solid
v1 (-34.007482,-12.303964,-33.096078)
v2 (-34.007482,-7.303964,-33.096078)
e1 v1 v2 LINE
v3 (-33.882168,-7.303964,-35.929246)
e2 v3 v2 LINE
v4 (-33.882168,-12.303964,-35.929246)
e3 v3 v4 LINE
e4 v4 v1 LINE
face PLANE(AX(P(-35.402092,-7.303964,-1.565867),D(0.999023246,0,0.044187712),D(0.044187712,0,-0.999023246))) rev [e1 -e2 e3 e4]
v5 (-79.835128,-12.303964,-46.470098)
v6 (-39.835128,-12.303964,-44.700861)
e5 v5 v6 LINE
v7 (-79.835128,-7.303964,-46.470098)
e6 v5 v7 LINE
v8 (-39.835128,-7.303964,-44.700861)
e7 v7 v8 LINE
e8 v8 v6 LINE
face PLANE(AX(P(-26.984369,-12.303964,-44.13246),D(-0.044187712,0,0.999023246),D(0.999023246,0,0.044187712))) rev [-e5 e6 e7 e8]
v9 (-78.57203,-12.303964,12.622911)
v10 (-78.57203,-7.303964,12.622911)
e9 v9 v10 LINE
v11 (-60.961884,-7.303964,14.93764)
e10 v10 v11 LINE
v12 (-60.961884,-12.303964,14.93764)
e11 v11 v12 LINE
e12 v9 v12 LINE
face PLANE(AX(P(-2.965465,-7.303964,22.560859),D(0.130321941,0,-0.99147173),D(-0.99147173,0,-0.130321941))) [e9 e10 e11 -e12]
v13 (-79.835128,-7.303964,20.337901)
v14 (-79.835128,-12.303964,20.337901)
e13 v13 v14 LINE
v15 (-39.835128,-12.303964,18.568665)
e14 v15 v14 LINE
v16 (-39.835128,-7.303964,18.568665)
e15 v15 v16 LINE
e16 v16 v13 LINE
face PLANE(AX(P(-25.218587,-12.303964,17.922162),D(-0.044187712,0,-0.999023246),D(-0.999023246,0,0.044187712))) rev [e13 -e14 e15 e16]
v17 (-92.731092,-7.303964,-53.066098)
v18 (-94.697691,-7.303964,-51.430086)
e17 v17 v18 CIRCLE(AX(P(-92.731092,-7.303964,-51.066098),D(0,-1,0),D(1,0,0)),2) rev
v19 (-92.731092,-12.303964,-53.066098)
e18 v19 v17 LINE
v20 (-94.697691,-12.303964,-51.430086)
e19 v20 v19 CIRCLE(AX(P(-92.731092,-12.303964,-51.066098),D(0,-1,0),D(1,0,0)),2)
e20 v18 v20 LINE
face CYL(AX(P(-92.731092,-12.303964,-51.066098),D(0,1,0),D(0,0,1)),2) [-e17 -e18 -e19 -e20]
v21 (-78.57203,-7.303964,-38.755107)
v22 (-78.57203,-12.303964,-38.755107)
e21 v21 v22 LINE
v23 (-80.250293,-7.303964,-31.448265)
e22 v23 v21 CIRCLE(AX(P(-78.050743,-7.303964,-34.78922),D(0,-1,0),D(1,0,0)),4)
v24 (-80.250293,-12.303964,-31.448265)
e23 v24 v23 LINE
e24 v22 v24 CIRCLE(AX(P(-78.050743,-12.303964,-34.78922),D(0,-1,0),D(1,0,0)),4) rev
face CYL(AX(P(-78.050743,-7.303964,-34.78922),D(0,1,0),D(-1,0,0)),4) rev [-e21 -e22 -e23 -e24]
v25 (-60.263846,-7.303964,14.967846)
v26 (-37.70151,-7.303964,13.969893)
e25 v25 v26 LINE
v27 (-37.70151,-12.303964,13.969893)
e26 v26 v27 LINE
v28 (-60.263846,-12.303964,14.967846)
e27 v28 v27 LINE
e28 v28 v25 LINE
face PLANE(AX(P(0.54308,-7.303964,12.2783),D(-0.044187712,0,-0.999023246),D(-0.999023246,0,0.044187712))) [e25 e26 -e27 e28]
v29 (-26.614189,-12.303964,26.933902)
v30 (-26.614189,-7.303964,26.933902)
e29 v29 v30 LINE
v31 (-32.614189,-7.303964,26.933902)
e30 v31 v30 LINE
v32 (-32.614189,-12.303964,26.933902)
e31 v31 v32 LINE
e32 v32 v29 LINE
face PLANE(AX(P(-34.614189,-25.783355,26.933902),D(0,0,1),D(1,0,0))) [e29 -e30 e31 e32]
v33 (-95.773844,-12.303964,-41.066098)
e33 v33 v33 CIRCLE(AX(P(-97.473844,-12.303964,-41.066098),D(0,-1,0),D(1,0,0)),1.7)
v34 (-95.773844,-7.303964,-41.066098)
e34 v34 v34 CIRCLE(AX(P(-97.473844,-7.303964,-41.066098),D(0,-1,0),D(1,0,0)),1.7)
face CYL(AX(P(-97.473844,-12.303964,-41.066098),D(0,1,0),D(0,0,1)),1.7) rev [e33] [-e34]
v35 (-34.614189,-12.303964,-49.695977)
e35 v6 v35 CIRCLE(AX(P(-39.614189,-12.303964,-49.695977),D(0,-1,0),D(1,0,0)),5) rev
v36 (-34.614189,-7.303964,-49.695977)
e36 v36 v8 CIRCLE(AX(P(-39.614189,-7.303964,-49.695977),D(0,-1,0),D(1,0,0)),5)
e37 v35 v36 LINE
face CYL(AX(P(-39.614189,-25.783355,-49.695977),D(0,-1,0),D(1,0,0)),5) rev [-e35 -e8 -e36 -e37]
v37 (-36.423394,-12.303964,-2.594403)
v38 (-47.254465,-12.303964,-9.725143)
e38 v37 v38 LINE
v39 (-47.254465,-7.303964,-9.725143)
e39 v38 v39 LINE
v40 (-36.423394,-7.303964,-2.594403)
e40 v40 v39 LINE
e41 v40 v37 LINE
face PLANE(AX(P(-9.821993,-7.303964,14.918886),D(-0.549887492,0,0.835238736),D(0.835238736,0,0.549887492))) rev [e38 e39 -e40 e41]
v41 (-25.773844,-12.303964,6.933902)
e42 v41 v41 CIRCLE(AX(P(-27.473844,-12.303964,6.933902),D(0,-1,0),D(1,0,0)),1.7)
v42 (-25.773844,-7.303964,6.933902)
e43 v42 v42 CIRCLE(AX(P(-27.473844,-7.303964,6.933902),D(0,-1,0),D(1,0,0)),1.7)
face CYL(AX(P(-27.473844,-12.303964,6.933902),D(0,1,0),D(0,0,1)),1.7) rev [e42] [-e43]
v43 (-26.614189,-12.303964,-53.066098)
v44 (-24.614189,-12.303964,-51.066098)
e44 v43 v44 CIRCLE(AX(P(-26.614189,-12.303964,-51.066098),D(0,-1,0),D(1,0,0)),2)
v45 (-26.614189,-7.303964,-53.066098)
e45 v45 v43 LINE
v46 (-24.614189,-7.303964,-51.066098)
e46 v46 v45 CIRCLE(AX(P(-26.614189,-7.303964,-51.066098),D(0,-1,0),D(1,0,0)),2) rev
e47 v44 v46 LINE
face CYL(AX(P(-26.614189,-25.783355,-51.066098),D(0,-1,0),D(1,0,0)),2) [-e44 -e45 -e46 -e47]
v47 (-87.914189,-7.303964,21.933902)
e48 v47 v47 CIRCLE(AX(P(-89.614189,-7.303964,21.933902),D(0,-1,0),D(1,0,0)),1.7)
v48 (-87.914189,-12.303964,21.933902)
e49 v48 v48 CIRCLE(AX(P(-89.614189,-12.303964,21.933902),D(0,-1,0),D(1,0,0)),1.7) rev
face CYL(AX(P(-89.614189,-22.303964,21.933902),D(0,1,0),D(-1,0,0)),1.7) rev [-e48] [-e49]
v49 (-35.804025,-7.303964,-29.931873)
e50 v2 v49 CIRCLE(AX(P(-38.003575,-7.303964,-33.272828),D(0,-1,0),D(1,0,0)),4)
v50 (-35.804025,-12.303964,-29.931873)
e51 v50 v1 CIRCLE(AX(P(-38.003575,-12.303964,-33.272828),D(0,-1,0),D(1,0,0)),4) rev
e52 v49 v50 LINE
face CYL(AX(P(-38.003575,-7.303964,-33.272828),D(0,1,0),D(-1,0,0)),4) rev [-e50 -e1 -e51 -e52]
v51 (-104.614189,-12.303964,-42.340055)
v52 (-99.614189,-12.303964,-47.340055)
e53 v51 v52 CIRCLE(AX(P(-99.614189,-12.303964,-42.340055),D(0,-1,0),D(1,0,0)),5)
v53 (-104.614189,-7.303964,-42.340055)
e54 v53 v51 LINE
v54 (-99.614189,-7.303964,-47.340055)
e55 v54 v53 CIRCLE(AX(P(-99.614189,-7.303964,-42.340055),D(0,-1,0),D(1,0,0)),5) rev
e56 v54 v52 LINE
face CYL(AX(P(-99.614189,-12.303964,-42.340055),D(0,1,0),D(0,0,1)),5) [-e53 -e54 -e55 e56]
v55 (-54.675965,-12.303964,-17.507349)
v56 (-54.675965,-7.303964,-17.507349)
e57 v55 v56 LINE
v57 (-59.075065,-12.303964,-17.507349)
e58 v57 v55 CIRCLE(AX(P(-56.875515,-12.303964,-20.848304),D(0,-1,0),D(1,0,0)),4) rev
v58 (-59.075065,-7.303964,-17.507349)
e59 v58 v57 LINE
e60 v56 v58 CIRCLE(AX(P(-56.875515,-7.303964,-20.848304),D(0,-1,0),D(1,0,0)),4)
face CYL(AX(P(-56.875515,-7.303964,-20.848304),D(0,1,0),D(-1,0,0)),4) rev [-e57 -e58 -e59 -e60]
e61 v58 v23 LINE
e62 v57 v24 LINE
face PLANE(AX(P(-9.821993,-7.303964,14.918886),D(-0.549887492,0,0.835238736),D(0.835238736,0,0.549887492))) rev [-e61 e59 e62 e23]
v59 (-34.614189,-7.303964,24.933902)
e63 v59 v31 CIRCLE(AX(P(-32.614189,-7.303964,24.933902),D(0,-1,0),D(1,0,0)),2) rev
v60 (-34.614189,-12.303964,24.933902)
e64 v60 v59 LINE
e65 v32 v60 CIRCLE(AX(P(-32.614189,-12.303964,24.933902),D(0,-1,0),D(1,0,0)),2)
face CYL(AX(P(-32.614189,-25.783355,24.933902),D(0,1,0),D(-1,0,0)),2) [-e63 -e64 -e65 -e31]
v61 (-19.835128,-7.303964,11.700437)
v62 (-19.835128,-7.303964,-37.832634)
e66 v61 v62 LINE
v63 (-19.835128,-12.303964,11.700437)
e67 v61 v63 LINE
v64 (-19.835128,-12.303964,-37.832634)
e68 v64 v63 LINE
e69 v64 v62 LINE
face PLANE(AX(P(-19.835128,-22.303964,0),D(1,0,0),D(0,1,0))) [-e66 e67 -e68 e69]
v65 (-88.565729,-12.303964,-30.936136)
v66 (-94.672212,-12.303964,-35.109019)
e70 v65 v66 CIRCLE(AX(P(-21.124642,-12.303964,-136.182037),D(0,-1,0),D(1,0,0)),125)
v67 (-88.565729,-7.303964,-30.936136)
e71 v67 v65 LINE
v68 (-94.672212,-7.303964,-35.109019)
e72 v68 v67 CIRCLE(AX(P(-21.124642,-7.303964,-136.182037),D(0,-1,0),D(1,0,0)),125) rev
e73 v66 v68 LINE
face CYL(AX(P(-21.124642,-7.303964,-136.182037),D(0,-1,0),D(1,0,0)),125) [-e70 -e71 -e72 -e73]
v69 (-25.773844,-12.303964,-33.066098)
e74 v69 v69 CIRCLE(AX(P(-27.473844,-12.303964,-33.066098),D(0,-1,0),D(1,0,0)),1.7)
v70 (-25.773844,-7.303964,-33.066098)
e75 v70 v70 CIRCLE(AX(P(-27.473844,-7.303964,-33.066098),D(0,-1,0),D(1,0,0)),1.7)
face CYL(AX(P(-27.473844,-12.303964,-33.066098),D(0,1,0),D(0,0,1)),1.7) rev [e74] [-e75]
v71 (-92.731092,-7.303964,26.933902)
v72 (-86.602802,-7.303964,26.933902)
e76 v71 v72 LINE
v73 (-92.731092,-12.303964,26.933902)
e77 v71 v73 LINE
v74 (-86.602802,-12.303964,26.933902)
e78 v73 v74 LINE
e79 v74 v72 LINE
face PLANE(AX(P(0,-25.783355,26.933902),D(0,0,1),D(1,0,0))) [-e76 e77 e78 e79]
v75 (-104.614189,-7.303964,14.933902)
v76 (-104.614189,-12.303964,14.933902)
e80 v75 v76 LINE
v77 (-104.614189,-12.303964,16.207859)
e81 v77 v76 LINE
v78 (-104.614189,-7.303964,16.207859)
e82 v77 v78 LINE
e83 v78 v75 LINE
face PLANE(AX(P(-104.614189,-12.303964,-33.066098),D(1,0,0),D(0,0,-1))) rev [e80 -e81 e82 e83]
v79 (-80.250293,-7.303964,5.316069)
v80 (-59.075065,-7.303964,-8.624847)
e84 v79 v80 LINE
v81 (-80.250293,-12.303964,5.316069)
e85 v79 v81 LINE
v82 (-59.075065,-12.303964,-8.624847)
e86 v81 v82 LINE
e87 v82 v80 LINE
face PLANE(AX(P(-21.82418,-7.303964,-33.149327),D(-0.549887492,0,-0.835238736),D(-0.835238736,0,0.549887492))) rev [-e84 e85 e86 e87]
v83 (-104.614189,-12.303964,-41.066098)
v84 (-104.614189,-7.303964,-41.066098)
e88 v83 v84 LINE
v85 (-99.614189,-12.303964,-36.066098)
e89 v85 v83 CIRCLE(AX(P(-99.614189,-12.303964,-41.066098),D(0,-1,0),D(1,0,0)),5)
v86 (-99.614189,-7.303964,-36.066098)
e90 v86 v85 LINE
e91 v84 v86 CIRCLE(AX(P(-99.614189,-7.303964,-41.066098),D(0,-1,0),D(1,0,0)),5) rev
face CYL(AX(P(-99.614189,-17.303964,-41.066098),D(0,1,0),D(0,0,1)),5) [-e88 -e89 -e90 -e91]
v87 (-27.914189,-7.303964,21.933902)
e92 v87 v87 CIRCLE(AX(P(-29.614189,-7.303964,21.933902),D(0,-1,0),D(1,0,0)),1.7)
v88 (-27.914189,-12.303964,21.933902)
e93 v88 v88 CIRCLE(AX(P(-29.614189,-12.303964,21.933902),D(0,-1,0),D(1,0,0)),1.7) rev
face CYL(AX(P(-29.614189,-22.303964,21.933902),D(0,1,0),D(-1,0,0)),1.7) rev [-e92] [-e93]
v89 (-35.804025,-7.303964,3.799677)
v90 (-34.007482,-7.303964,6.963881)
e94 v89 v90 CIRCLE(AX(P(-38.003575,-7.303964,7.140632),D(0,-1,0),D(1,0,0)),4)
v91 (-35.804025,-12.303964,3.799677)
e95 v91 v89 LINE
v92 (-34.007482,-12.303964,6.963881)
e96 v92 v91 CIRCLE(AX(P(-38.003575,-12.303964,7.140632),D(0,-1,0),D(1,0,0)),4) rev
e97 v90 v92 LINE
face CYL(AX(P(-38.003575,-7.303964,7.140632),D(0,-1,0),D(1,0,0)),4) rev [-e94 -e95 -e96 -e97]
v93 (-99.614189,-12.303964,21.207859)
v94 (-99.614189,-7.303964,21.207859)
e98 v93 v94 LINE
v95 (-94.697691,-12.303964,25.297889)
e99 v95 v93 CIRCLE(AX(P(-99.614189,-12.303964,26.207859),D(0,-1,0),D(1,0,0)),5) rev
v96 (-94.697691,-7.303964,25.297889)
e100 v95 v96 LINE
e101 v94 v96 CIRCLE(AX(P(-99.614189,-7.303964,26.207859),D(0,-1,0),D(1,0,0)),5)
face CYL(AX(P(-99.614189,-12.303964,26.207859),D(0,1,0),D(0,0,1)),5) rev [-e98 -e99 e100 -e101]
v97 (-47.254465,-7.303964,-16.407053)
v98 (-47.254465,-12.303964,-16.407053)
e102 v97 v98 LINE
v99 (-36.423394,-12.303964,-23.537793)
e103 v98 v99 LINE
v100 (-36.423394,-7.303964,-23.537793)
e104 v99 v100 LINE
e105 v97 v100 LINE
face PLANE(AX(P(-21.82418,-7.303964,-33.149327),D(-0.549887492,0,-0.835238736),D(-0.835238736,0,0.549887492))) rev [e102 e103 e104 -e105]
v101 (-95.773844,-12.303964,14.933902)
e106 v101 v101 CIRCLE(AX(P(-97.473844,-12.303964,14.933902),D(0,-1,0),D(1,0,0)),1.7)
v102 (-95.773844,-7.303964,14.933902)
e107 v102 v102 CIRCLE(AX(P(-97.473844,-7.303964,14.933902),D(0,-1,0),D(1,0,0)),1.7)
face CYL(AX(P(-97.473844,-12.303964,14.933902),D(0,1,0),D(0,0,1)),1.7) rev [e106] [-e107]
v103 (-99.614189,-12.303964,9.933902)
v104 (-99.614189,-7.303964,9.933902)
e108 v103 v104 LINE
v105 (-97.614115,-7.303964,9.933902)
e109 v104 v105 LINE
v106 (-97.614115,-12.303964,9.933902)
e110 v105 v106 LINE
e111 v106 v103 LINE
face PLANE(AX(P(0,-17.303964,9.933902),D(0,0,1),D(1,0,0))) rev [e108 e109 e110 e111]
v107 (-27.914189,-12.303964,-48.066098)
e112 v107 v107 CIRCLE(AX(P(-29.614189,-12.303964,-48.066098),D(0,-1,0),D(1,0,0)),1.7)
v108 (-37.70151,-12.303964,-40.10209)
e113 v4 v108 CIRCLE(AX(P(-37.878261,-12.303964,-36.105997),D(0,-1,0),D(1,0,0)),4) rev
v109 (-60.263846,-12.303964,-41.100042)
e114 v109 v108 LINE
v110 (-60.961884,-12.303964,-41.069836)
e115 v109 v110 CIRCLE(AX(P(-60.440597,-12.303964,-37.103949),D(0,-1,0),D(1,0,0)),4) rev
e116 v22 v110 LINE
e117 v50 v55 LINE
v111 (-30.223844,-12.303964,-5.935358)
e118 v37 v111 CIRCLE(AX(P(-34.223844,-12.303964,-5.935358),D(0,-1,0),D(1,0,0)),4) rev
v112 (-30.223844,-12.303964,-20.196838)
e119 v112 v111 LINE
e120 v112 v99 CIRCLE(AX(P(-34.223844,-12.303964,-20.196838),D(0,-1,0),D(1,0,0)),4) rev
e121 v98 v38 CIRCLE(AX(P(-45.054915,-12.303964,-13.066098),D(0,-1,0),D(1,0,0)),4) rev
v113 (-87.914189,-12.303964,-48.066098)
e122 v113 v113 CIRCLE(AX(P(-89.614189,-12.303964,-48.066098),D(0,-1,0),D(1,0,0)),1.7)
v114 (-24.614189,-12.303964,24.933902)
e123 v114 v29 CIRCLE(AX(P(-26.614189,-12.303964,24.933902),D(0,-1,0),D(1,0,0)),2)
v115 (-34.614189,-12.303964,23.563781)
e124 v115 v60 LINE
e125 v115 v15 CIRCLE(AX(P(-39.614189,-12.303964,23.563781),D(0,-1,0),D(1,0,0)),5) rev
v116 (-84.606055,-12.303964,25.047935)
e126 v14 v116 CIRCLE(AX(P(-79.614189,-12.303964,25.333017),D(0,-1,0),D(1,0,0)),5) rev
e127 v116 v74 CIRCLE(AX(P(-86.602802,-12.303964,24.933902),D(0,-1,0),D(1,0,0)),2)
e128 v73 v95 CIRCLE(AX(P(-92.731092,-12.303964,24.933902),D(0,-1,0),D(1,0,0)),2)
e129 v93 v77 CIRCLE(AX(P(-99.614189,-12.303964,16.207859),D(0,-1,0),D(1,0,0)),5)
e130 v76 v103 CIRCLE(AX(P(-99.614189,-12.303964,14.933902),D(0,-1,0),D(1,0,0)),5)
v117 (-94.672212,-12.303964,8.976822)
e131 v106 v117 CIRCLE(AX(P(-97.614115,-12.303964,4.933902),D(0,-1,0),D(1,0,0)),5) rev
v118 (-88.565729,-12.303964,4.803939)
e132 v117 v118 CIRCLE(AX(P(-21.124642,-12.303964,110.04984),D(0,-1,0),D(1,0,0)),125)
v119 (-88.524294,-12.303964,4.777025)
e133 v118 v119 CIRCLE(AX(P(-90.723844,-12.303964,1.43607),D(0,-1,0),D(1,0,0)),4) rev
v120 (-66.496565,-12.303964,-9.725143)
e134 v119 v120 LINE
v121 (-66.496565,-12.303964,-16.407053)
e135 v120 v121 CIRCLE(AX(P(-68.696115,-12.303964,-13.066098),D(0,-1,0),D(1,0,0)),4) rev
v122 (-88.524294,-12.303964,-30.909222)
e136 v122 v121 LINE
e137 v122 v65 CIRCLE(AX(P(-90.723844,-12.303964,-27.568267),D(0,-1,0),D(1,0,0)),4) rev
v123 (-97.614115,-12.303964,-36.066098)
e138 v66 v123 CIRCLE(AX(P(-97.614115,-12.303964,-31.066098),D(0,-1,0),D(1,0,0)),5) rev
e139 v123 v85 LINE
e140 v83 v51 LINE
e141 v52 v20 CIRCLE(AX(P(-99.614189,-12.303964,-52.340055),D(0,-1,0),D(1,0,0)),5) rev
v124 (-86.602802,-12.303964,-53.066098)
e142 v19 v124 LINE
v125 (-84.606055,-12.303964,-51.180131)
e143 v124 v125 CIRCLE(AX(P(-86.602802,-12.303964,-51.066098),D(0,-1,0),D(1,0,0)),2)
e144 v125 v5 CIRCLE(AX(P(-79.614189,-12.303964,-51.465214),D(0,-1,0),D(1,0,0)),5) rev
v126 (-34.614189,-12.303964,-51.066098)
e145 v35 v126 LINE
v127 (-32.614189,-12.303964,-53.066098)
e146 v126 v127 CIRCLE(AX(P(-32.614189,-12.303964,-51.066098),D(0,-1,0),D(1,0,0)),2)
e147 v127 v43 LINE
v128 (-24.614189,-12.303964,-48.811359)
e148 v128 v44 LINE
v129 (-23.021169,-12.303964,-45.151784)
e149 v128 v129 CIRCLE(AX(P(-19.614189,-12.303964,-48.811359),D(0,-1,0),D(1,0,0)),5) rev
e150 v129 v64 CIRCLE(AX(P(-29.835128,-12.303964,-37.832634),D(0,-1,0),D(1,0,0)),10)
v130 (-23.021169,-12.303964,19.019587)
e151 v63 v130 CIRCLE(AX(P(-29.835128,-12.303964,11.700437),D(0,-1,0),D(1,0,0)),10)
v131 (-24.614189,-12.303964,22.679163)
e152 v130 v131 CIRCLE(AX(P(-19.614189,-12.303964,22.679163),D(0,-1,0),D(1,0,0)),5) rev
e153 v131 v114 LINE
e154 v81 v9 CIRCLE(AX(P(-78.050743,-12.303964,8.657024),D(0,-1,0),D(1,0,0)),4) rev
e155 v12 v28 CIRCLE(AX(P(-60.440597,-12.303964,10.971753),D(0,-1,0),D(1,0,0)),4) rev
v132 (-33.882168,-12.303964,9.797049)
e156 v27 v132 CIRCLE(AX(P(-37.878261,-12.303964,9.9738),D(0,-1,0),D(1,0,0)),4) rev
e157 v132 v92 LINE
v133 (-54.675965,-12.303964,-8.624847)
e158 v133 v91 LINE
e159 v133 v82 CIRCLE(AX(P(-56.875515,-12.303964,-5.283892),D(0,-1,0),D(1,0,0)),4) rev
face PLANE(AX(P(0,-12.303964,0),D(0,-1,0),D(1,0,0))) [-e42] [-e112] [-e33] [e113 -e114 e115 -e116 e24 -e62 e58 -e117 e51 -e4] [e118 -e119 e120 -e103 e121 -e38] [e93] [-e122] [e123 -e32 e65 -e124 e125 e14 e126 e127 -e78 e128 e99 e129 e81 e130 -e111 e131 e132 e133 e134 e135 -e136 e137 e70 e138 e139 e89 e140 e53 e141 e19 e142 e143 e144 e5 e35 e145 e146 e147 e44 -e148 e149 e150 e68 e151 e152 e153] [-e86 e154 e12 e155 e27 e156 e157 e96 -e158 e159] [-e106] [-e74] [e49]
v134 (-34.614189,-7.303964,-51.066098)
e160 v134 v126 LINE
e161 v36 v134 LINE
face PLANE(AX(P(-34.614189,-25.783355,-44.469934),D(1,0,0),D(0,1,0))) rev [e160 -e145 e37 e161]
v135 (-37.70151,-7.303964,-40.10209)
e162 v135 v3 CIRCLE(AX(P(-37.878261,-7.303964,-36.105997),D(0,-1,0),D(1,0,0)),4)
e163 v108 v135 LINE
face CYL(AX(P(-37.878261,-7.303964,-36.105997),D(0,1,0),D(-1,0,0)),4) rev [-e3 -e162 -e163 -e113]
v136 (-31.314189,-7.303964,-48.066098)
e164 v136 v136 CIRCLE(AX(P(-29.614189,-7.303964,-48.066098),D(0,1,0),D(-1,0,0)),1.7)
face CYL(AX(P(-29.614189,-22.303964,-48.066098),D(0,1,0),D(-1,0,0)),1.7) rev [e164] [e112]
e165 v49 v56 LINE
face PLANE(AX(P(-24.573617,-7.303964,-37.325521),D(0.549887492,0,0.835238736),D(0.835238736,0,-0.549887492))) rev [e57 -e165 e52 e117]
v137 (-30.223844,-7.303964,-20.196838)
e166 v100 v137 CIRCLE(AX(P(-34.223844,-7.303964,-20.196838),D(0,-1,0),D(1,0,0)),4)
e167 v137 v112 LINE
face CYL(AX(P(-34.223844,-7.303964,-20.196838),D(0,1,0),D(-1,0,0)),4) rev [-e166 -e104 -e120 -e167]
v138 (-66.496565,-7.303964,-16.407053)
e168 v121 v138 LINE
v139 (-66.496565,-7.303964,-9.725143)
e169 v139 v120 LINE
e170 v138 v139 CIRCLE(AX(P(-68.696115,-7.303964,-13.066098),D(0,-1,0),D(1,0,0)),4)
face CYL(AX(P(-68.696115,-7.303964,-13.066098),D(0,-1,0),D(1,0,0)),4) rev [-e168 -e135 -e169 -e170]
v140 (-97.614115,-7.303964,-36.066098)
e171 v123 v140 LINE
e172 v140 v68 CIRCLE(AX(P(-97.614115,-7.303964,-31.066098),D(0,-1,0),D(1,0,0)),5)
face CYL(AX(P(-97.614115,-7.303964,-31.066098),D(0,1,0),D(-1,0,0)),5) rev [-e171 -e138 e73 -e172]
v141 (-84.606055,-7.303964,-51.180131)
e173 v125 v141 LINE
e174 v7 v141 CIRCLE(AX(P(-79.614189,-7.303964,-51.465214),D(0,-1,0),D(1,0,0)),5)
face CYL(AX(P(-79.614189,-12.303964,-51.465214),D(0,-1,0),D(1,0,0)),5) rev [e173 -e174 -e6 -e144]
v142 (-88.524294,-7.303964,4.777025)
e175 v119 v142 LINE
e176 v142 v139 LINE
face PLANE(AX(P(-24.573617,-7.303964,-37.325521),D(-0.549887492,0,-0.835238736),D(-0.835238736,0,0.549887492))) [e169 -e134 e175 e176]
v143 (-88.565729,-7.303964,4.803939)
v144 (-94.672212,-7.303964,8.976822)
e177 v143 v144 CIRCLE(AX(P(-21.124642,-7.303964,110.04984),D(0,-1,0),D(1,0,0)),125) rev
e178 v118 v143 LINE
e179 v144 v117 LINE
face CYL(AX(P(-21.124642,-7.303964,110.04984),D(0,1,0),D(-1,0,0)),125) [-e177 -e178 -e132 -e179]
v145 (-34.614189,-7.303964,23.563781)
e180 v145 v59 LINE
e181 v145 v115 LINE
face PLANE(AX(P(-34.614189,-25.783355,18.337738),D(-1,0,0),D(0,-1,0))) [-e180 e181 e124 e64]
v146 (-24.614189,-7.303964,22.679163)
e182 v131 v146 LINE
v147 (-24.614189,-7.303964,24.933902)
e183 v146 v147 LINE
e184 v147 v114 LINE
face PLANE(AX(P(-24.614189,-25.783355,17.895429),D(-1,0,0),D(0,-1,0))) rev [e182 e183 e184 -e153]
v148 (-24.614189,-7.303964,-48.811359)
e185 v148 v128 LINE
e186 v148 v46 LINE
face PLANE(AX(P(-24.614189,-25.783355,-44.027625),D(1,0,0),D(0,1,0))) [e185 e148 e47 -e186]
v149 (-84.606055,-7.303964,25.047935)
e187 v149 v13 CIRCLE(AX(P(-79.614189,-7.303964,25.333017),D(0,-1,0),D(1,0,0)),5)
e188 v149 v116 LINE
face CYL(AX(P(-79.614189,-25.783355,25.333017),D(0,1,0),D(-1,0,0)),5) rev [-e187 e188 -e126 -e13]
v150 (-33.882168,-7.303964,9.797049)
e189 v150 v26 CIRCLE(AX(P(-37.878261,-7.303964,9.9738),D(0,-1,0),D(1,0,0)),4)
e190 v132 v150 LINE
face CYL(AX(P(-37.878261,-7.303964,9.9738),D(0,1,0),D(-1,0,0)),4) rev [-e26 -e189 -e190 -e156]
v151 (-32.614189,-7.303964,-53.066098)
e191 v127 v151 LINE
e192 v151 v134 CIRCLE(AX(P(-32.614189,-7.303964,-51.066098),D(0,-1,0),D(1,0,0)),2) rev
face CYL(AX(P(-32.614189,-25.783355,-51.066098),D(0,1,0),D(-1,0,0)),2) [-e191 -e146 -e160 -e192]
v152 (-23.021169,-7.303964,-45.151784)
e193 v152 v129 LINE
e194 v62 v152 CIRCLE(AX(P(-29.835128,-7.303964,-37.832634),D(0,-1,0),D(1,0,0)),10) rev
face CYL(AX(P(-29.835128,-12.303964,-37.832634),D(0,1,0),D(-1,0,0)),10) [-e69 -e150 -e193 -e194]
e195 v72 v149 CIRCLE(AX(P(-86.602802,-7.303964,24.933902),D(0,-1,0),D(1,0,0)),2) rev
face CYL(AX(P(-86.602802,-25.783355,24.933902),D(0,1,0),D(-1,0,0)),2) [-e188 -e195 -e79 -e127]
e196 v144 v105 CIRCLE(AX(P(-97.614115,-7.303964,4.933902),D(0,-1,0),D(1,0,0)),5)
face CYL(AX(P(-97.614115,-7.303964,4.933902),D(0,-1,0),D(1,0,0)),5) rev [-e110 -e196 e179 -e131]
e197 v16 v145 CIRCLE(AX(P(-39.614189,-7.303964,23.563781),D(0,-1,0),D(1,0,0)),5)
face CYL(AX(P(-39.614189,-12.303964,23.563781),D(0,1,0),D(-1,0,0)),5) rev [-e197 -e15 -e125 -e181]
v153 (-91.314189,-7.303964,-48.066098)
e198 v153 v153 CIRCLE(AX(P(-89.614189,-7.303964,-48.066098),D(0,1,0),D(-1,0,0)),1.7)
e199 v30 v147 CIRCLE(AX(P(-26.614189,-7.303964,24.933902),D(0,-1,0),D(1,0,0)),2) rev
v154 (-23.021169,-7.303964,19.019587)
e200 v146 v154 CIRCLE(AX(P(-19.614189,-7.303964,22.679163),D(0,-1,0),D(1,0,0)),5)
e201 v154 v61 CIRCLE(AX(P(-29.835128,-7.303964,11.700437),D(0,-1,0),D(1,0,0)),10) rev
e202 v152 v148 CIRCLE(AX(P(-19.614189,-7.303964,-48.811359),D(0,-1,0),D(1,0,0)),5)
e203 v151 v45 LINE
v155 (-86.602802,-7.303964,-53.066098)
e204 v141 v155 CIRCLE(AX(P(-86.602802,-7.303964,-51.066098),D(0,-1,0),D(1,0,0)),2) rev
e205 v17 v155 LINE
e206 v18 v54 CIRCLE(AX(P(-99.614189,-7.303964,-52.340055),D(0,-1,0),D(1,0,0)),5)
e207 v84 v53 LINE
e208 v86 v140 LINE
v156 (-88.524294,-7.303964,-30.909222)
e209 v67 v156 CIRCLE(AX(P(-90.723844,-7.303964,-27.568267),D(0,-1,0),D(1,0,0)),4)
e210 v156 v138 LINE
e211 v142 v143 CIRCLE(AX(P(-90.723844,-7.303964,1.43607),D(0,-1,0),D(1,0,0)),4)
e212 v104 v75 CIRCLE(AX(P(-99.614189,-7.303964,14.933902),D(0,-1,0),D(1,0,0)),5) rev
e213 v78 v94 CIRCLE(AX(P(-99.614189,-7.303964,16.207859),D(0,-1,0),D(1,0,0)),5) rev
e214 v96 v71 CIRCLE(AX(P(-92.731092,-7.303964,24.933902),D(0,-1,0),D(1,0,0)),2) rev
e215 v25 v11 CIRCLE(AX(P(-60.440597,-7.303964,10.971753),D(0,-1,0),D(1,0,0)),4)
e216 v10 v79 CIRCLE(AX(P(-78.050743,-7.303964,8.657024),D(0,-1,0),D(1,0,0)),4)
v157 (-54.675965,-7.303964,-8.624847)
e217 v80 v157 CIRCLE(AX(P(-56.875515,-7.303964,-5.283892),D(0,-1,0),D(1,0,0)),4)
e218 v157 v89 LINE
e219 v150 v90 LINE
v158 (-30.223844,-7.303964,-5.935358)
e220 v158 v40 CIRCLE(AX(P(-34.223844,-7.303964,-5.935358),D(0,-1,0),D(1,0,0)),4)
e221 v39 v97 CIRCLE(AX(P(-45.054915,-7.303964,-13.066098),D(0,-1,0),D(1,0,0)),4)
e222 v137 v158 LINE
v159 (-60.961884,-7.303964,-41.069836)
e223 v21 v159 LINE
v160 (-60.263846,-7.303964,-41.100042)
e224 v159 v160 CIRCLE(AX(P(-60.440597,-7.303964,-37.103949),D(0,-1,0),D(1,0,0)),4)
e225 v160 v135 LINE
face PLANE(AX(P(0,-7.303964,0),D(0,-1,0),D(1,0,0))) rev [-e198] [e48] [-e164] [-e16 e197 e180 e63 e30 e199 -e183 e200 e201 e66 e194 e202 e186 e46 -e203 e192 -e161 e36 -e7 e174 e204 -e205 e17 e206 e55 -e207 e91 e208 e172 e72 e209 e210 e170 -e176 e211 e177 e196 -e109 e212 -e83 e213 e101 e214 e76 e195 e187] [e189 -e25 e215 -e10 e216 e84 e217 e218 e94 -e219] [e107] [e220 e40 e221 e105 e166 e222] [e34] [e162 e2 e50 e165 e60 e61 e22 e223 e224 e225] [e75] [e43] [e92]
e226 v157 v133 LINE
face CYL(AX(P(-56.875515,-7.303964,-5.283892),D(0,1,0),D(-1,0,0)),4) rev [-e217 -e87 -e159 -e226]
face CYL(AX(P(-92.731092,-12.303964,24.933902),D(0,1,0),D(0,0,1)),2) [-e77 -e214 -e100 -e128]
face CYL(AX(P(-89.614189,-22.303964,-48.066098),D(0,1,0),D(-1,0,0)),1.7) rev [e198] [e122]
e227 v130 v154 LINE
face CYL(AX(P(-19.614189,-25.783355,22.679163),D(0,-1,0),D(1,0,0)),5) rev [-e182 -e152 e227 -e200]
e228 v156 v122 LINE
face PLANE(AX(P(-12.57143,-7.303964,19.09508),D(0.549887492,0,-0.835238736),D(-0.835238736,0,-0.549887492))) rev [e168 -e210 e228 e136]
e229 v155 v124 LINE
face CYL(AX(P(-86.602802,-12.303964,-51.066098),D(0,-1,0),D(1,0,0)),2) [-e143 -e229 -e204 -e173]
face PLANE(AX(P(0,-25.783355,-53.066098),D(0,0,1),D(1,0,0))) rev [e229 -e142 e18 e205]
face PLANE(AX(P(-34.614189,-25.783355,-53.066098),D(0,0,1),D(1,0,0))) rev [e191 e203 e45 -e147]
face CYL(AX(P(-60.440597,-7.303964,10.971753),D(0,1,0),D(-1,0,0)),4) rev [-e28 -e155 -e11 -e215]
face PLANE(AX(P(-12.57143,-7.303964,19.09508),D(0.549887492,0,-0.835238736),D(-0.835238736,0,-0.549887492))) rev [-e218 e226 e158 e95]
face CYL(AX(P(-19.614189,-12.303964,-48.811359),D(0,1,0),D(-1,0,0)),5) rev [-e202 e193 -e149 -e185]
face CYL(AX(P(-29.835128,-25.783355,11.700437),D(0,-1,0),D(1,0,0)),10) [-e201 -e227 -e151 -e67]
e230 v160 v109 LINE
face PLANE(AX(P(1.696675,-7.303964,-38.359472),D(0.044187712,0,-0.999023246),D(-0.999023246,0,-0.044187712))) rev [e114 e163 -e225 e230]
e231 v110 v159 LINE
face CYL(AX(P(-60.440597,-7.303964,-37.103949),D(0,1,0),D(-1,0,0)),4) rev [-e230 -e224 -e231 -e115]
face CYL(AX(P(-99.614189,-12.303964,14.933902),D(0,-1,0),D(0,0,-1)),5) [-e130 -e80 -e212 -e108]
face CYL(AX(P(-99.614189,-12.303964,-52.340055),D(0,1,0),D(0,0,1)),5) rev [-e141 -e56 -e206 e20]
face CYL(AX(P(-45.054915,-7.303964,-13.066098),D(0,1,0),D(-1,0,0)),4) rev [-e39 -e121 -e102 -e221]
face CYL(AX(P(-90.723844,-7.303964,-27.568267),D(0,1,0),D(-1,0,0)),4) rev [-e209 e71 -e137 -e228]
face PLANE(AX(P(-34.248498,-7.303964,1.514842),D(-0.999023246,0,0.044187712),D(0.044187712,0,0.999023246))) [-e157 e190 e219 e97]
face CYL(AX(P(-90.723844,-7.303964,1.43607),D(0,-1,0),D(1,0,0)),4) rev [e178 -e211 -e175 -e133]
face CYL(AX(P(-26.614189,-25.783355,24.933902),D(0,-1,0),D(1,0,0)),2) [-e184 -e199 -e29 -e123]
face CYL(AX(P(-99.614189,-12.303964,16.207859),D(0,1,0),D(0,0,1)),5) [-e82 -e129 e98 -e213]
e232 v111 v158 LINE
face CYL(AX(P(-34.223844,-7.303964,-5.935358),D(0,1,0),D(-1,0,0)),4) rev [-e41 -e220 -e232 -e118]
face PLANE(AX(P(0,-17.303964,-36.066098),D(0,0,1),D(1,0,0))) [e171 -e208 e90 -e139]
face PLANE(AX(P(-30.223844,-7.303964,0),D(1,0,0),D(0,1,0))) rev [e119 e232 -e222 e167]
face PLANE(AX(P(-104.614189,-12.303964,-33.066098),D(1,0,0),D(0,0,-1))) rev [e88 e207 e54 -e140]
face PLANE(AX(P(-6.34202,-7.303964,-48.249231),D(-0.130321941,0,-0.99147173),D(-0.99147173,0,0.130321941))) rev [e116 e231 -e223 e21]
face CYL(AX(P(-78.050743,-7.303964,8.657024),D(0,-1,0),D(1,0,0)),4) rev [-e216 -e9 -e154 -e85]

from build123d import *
from OCP.BRepAlgoAPI import BRepAlgoAPI_Cut
from OCP.TopTools import TopTools_ListOfShape
from build123d.topology import SkipClean

# Parameters (mm, degrees)
BOSS_EXTRUDE1_START = -7.303964
SKETCH1_R           = 1.7
BOSS_EXTRUDE1_DEPTH = 5
BOSS_EXTRUDE2_START = -5
BOSS_EXTRUDE2_DEPTH = 10
FILLET1_R           = 10
FILLET2_R           = 5
SKETCH3_R           = 1.7
CUT_EXTRUDE1_DEPTH  = 115.408610769
CUT_EXTRUDE2_START  = -8.799934
SKETCH3_3_W         = 50.432532057
SKETCH3_3_H         = 8
SKETCH3_3_R         = 1.7
CUT_EXTRUDE2_DEPTH  = 4.020873
FILLET3_R           = 4
SKETCH4_W           = 13.412803122
SKETCH4_H           = 1.981813703
CUT_EXTRUDE3_DEPTH  = 116.802458496
FILLET5_R           = 10
BOSS_EXTRUDE3_DEPTH = 5
SKETCH5_3_R         = 1.7
CUT_EXTRUDE4_DEPTH  = 119.258781358
FILLET6_START       = -12.303963631
FILLET6_DEPTH       = 5
FILLET7_R           = 2
CUT_EXTRUDE5_START  = -5
CUT_EXTRUDE5_DEPTH  = 5
FILLET8_R           = 4
CUT_EXTRUDE6_DEPTH  = 119.258781358
FILLET9_R           = 10
SKETCH8_W           = 12
SKETCH8_H           = 46
CUT_EXTRUDE7_DEPTH  = 10
FILLET10_START      = -13
FILLET10_DEPTH      = 7
FILLET10_START_2    = -12.303963631
FILLET10_2_DEPTH    = 5
FILLET12_R          = 125


with BuildPart() as part:
    # Sketch1 → Boss-Extrude1 (new body)
    with BuildSketch(Plane(origin=(0, 0, 0), x_dir=(1, 0, 0), z_dir=(0, 1, 0)).offset(BOSS_EXTRUDE1_START)):
        Polygon((-104.614189207, 47.566098263), (-104.614189207, -21.433901737), (-2.875393248, -16.933901737), (-2.875393248, 43.066098263), align=None)
        with Locations((-27.473844214, 33.066098263)):
            Circle(SKETCH1_R, mode=Mode.SUBTRACT)
        with Locations((-97.473844214, 41.066098263)):
            Circle(SKETCH1_R, mode=Mode.SUBTRACT)
        with Locations((-97.473844214, -14.933901737)):
            Circle(SKETCH1_R, mode=Mode.SUBTRACT)
        with Locations((-27.473844214, -6.933901737)):
            Circle(SKETCH1_R, mode=Mode.SUBTRACT)
    extrude(amount=-BOSS_EXTRUDE1_DEPTH)

    # Sketch2 → Boss-Extrude2 (add)
    with BuildSketch(Plane(origin=(0, -7.303963631, 0), x_dir=(1, 0, 0), z_dir=(0, 1, 0)).offset(BOSS_EXTRUDE2_START)):
        Polygon((-7.675393248, 43.278406653), (-2.875393248, 43.066098263), (-2.875393248, -16.933901737), (-7.675393248, -17.146210127), align=None)
    extrude(amount=-BOSS_EXTRUDE2_DEPTH)

    # Fillet1
    fillet1_edges = [part.edges().sort_by_distance(p)[0] for p in [
        (-7.675393248, -12.303963631, -13.066098263),
    ]]
    fillet(fillet1_edges, radius=FILLET1_R - 0.0001)  # a hair under: the kernel refuses the full size

    # Fillet2
    fillet2_edges = [part.edges().sort_by_distance(p)[0] for p in [
        (-2.875393248, -14.803963816, 16.933901737),
        (-2.875393248, -14.803963816, -43.066098263),
        (-104.614189207, -9.803964, -47.566098263),
        (-104.614189207, -9.803964, 21.433901737),
    ]]
    fillet(fillet2_edges, radius=FILLET2_R)

    # Sketch3 → Cut-Extrude1 (cut, through all)
    with BuildSketch(Plane(origin=(-2.875393248, 0, 0), x_dir=(0, 0, -1), z_dir=(1, 0, 0))):
        with Locations((-8.150167766, -18.303963631)):
            Circle(SKETCH3_R)
        with Locations((-1.078501099, -18.303963631)):
            Circle(SKETCH3_R)
        with Locations((5.993165568, -18.303963631)):
            Circle(SKETCH3_R)
        with Locations((13.064832234, -18.303963631)):
            Circle(SKETCH3_R)
        with Locations((20.136498901, -18.303963631)):
            Circle(SKETCH3_R)
        with Locations((34.279832234, -18.303963631)):
            Circle(SKETCH3_R)
        with Locations((27.208165568, -18.303963631)):
            Circle(SKETCH3_R)
    extrude(amount=-CUT_EXTRUDE1_DEPTH, mode=Mode.SUBTRACT)

    # Sketch3<3> → Cut-Extrude2 (cut)
    with BuildSketch(Plane(origin=(-2.875393248, 0, 0), x_dir=(0, 0, -1), z_dir=(1, 0, 0)).offset(CUT_EXTRUDE2_START)):
        with Locations((13.066098262, -18.303963631)):
            Rectangle(SKETCH3_3_W, SKETCH3_3_H)
        with Locations((-8.150167766, -18.303963631)):
            Circle(SKETCH3_3_R, mode=Mode.SUBTRACT)
        with Locations((-1.078501099, -18.303963631)):
            Circle(SKETCH3_3_R, mode=Mode.SUBTRACT)
        with Locations((5.993165568, -18.303963631)):
            Circle(SKETCH3_3_R, mode=Mode.SUBTRACT)
        with Locations((13.064832234, -18.303963631)):
            Circle(SKETCH3_3_R, mode=Mode.SUBTRACT)
        with Locations((20.136498901, -18.303963631)):
            Circle(SKETCH3_3_R, mode=Mode.SUBTRACT)
        with Locations((27.208165568, -18.303963631)):
            Circle(SKETCH3_3_R, mode=Mode.SUBTRACT)
        with Locations((34.279832234, -18.303963631)):
            Circle(SKETCH3_3_R, mode=Mode.SUBTRACT)
    extrude(amount=CUT_EXTRUDE2_DEPTH, mode=Mode.SUBTRACT)

    # Fillet3
    fillet3_edges = [part.edges().sort_by_distance(p)[0] for p in [
        (-9.664890748, -14.303963631, 12.150167766),
        (-9.664890748, -14.303963631, -38.282364291),
    ]]
    fillet(fillet3_edges, radius=FILLET3_R)

    # Sketch4 → Cut-Extrude3 (cut, through all)
    with BuildSketch(Plane.XZ.offset(22.303963631)):
        with Locations((-10.968991687, 16.597612422)):
            Rectangle(SKETCH4_W, SKETCH4_H)
        with Locations((-10.968991687, -42.729808949)):
            Rectangle(SKETCH4_W, SKETCH4_H)
    extrude(amount=-CUT_EXTRUDE3_DEPTH, mode=Mode.SUBTRACT)

    # Fillet5
    # the kernel refuses this fillet: 10 mm, written as the material it adds along each edge
    with BuildSketch(Plane(origin=(-17.675393248, -27.24315083, -41.738902097), x_dir=(1, 0, 0), z_dir=(0, 1, 0))) as fillet5_piece_1_section:
        with BuildLine():
            CenterArc((5.975674732, 10), FILLET5_R, 233.304121322, 36.695878678)
            Line((0, 1.981813703), (0, 0))
            Line((0, 0), (5.975674732, 0))
        make_face()
    fillet5_piece_1 = extrude(amount=19.93918683, mode=Mode.PRIVATE)
    fillet5_piece_1 = fillet5_piece_1 - Plane(origin=(-17.675293248, -22.303864, -41.738902097), x_dir=(0, 1, 0), z_dir=(0, 0, -1)) * Cylinder(9.9999, 64, mode=Mode.PRIVATE)
    add(fillet5_piece_1)
    with BuildSketch(Plane(origin=(-17.675393248, -27.24315083, 15.606705571), x_dir=(1, 0, 0), z_dir=(0, 1, 0))) as fillet5_piece_2_section:
        with BuildLine():
            CenterArc((5.975674732, -10), FILLET5_R, 90, 36.695878678)
            Line((0, -1.981813703), (0, 0))
            Line((0, 0), (5.975674732, 0))
        make_face()
    fillet5_piece_2 = extrude(amount=19.93918683, mode=Mode.PRIVATE)
    fillet5_piece_2 = fillet5_piece_2 - Plane(origin=(-17.675293248, -22.303864, 15.606705571), x_dir=(0, 1, 0), z_dir=(0, 0, -1)) * Cylinder(9.9999, 64, mode=Mode.PRIVATE)
    add(fillet5_piece_2)

    # Sketch5 → Boss-Extrude3 (add)
    with BuildSketch(Plane(origin=(0, -7.303963631, 0), x_dir=(1, 0, 0), z_dir=(0, 1, 0))):
        with BuildLine():
            Line((-84.614189207, 53.066098263), (-94.614189207, 53.066098263))
            Line((-94.614189207, 53.066098263), (-94.614189207, 47.123789116))
            Line((-94.614189207, 47.123789116), (-90.904900538, 46.959723886))
            ThreePointArc((-90.904900538, 46.959723886), (-90.204015766, 49.660496153), (-87.914189207, 48.066098263))
            ThreePointArc((-87.914189207, 48.066098263), (-88.047411738, 47.406395025), (-88.426199045, 46.850088652))
            Line((-88.426199045, 46.850088652), (-84.614189207, 46.68147997))
            Line((-84.614189207, 46.68147997), (-84.614189207, 53.066098263))
        make_face()
        with BuildLine():
            ThreePointArc((-87.914189207, 48.066098263), (-90.204015766, 49.660496153), (-90.904900538, 46.959723886))
            Line((-90.904900538, 46.959723886), (-88.426199045, 46.850088652))
            ThreePointArc((-88.426199045, 46.850088652), (-88.047411738, 47.406395025), (-87.914189207, 48.066098263))
        make_face()
        with BuildLine():
            Line((-88.426199045, 46.850088652), (-90.904900538, 46.959723886))
            ThreePointArc((-90.904900538, 46.959723886), (-89.689308318, 46.367758745), (-88.426199045, 46.850088652))
        make_face()
        with BuildLine():
            Line((-94.614189207, -26.933901737), (-84.614189207, -26.933901737))
            Line((-84.614189207, -26.933901737), (-84.614189207, -20.549283444))
            Line((-84.614189207, -20.549283444), (-88.426199045, -20.717892126))
            ThreePointArc((-88.426199045, -20.717892126), (-88.047411738, -21.274198499), (-87.914189207, -21.933901737))
            ThreePointArc((-87.914189207, -21.933901737), (-90.204015766, -23.528299627), (-90.904900538, -20.82752736))
            Line((-90.904900538, -20.82752736), (-94.614189207, -20.991592591))
            Line((-94.614189207, -20.991592591), (-94.614189207, -26.933901737))
        make_face()
        with BuildLine():
            ThreePointArc((-87.914189207, -21.933901737), (-88.047411738, -21.274198499), (-88.426199045, -20.717892126))
            Line((-88.426199045, -20.717892126), (-90.904900538, -20.82752736))
            ThreePointArc((-90.904900538, -20.82752736), (-90.204015766, -23.528299627), (-87.914189207, -21.933901737))
        make_face()
        with BuildLine():
            Line((-90.904900538, -20.82752736), (-88.426199045, -20.717892126))
            ThreePointArc((-88.426199045, -20.717892126), (-89.689308318, -20.235562219), (-90.904900538, -20.82752736))
        make_face()
        Polygon((-34.614189207, -18.337737712), (-24.614189207, -17.895428566), (-24.614189207, -26.933901737), (-34.614189207, -26.933901737), align=None)
        Polygon((-24.614189207, 44.027625091), (-24.614189207, 53.066098263), (-34.614189207, 53.066098263), (-34.614189207, 44.469934238), align=None)
    extrude(amount=-BOSS_EXTRUDE3_DEPTH)

    # Sketch5<3> → Cut-Extrude4 (cut, through all)
    with BuildSketch(Plane(origin=(0, -7.303963631, 0), x_dir=(1, 0, 0), z_dir=(0, 1, 0))):
        with Locations(Location((-89.614189207, 48.066098263, 0), (0, 0, 180))):
            Circle(SKETCH5_3_R)
        with Locations((-89.614189207, -21.933901737)):
            Circle(SKETCH5_3_R)
        with Locations(Location((-29.614189207, 48.066098263, 0), (0, 0, 180))):
            Circle(SKETCH5_3_R)
        with Locations((-29.614189207, -21.933901737)):
            Circle(SKETCH5_3_R)
    extrude(amount=-CUT_EXTRUDE4_DEPTH, mode=Mode.SUBTRACT)

    # Fillet6: read off the stored shape, not the designer's step
    # Fillet6 outline → Fillet6 (add)
    with BuildSketch(Plane(origin=(0, 0, 0), x_dir=(1, 0, 0), z_dir=(0, 1, 0)).offset(FILLET6_START)):
        with BuildLine():
            Line((-34.614189207, 44.469934238), (-34.614189207, 49.695977356))
            ThreePointArc((-34.614189207, 49.695977356), (-36.157651402, 46.083174234), (-39.835127767, 44.700861126))
            Line((-39.835127767, 44.700861126), (-34.614189207, 44.469934238))
        make_face()
        with BuildLine():
            Line((-84.614189207, 46.68147997), (-79.835127767, 46.470097711))
            ThreePointArc((-79.835127767, 46.470097711), (-83.22699233, 48.008676136), (-84.614189207, 51.465213942))
            Line((-84.614189207, 51.465213942), (-84.614189207, 46.68147997))
        make_face()
        with BuildLine():
            ThreePointArc((-19.835127767, 43.816242833), (-23.22699233, 45.354821257), (-24.614189207, 48.811359063))
            Line((-24.614189207, 48.811359063), (-24.614189207, 44.027625091))
            Line((-24.614189207, 44.027625091), (-19.835127767, 43.816242833))
        make_face()
        with BuildLine():
            ThreePointArc((-84.614189207, -25.333017416), (-83.22699233, -21.87647961), (-79.835127767, -20.337901186))
            Line((-79.835127767, -20.337901186), (-84.614189207, -20.549283444))
            Line((-84.614189207, -20.549283444), (-84.614189207, -25.333017416))
        make_face()
        with BuildLine():
            ThreePointArc((-39.835127767, -18.5686646), (-36.157651402, -19.950977708), (-34.614189207, -23.56378083))
            Line((-34.614189207, -23.56378083), (-34.614189207, -18.337737712))
            Line((-34.614189207, -18.337737712), (-39.835127767, -18.5686646))
        make_face()
        with BuildLine():
            Line((-24.614189207, -17.895428566), (-24.614189207, -22.679162537))
            ThreePointArc((-24.614189207, -22.679162537), (-23.226992329, -19.222624731), (-19.835127767, -17.684046307))
            Line((-19.835127767, -17.684046307), (-24.614189207, -17.895428566))
        make_face()
        with BuildLine():
            ThreePointArc((-94.614189207, 52.340055145), (-96.078655302, 48.80452124), (-99.614189207, 47.340055145))
            ThreePointArc((-99.614189207, 47.340055145), (-99.503692942, 47.338834053), (-99.393250648, 47.335171375))
            Line((-99.393250648, 47.335171375), (-94.614189207, 47.123789116))
            Line((-94.614189207, 47.123789116), (-94.614189207, 52.340055145))
        make_face()
        with BuildLine():
            ThreePointArc((-99.614189207, -21.207858619), (-96.078655301, -22.672324714), (-94.614189207, -26.207858619))
            Line((-94.614189207, -26.207858619), (-94.614189207, -20.991592591))
            Line((-94.614189207, -20.991592591), (-99.393250648, -21.202974849))
            ThreePointArc((-99.393250648, -21.202974849), (-99.503692942, -21.206637527), (-99.614189207, -21.207858619))
        make_face()
    extrude(amount=FILLET6_DEPTH)

    # Fillet7
    # the kernel refuses this fillet: 2 mm, written as the material it takes off along each edge
    with BuildSketch(Plane(origin=(-84.614189207, -2.332432025, 26.933901737), x_dir=(0.004312775009976594, 0, -0.9999906999426111), z_dir=(0, -1, 0))) as fillet7_piece_1:
        with BuildLine():
            CenterArc((1.991404961, -1.997219699), FILLET7_R, 93.021474281, 86.731421147)
            Line((-0.008576439, -1.988594149), (-0.208574579, -1.987731593))
            Line((-0.208574579, -1.987731593), (-0.19999814, 0.000862555))
            Line((-0.19999814, 0.000862555), (0.000862555, 0.19999814))
            ThreePointArc((0.000862555, 0.19999814), (1.601731988, 0.193093887), (1.875442442, 0.19972197))
            Line((1.875442442, 0.19972197), (1.885984489, 0))
        make_face()
    extrude(amount=14.943063214, mode=Mode.SUBTRACT)
    with BuildSketch(Plane(origin=(-94.614189207, -2.596219396, 26.933901737), x_dir=(1, 0, 0), z_dir=(0, -1, 0))) as fillet7_piece_2:
        with BuildLine():
            CenterArc((1.883097694, -2), FILLET7_R, 90, 79.51408304)
            Line((-0.083501647, -1.636012319), (-0.280161581, -1.599613551))
            ThreePointArc((-0.280161581, -1.599613551), (-0.2, -0.726043118), (-0.2, 0))
            Line((-0.2, 0), (0, 0.2))
            Line((0, 0.2), (1.883097694, 0.2))
            Line((1.883097694, 0.2), (1.883097694, 0))
        make_face()
    extrude(amount=14.41548847, mode=Mode.SUBTRACT)
    with BuildSketch(Plane(origin=(-84.614189207, -2.332432025, -53.066098263), x_dir=(-1, 0, 0), z_dir=(0, -1, 0))) as fillet7_piece_3:
        with BuildLine():
            CenterArc((1.988612643, -2), FILLET7_R, 90, 86.73142114)
            Line((-0.008133827, -1.885966949), (-0.207808474, -1.874563644))
            ThreePointArc((-0.207808474, -1.874563644), (-0.2, -1.600884321), (-0.2, 0))
            Line((-0.2, 0), (0, 0.2))
            Line((0, 0.2), (1.988612643, 0.2))
            Line((1.988612643, 0.2), (1.988612643, 0))
        make_face()
    extrude(amount=14.943063213, mode=Mode.SUBTRACT)
    with BuildSketch(Plane(origin=(-94.614189207, -2.596219397, -53.066098263), x_dir=(-0.0509733912520259, 0, 0.9987000117073535), z_dir=(0, -1, 0))) as fillet7_piece_4:
        with BuildLine():
            CenterArc((1.901412148, -1.982596471), FILLET7_R, 97.564090564, 79.514083027)
            Line((-0.095987876, -1.880649689), (-0.295727878, -1.870455011))
            Line((-0.295727878, -1.870455011), (-0.199740002, 0.010194678))
            Line((-0.199740002, 0.010194678), (0.010194678, 0.199740002))
            ThreePointArc((0.010194678, 0.199740002), (0.735293948, 0.162731122), (1.611814858, 0.198259647))
            Line((1.611814858, 0.198259647), (1.638141884, 0))
        make_face()
    extrude(amount=14.415488469, mode=Mode.SUBTRACT)
    with BuildSketch(Plane(origin=(-34.614189207, -2.303963631, -53.066098263), x_dir=(1, 0, 0), z_dir=(0, -1, 0)), Plane(origin=(-24.614189207, -2.303963631, -53.066098263), x_dir=(0, 0, 1), z_dir=(0, -1, 0)), Plane(origin=(-34.614189207, -2.303963631, 26.933901737), x_dir=(0, 0, -1), z_dir=(0, -1, 0))) as fillet7_piece_5:
        with BuildLine():
            CenterArc((FILLET7_R, FILLET7_R), FILLET7_R, 180, 90)
            Line((0, FILLET7_R), (0, 0))
            Line((0, 0), (FILLET7_R, 0))
        make_face()
    extrude(amount=15, mode=Mode.SUBTRACT)
    with BuildSketch(Plane(origin=(-24.614189207, -2.303963631, 26.933901737), x_dir=(0, 0, -1), z_dir=(0, -1, 0))) as fillet7_piece_6:
        with BuildLine():
            CenterArc((FILLET7_R, -FILLET7_R), FILLET7_R, 90, 90)
            Line((0, -FILLET7_R), (0, 0))
            Line((0, 0), (FILLET7_R, 0))
        make_face()
    extrude(amount=15, mode=Mode.SUBTRACT)


with BuildPart() as cut_extrude5_tool:
    # Cut-Extrude5: read off the stored shape, not the designer's step
    # Cut-Extrude5 outline → Cut-Extrude5 (new body)
    with BuildSketch(Plane.XZ.offset(12.303963631).offset(CUT_EXTRUDE5_START)):
        Polygon((-61.421899314, -13.066098263), (-94.723844214, 8.858558904), (-94.723844214, -34.99075543), align=None)
        Polygon((-33.705417369, -39.925338738), (-34.097751043, -31.055215265), (-56.875514756, -16.05925446), (-89.222466664, -37.355182765), (-60.614189207, -41.115538328), align=None)
        Polygon((-89.222466664, 11.222986239), (-56.875514756, -10.072942065), (-34.097751043, 4.923018739), (-33.705417369, 13.793142212), (-60.614189207, 14.983341803), align=None)
        Polygon((-30.223844214, -27.619326858), (-30.223844214, 1.487130332), (-52.329130199, -13.066098263), align=None)
    extrude(amount=CUT_EXTRUDE5_DEPTH)


with BuildPart() as part_1:
    add(part.part)

    # Cut-Extrude5: cut by cut_extrude5_tool, with a tolerance
    cut_extrude5_stock = TopTools_ListOfShape()
    cut_extrude5_stock.Append(part_1.part.wrapped)
    cut_extrude5_tools = TopTools_ListOfShape()
    cut_extrude5_tools.Append(cut_extrude5_tool.part.wrapped)
    cut_extrude5_cut = BRepAlgoAPI_Cut()
    cut_extrude5_cut.SetArguments(cut_extrude5_stock)
    cut_extrude5_cut.SetTools(cut_extrude5_tools)
    cut_extrude5_cut.SetFuzzyValue(0.00001)
    cut_extrude5_cut.Build()
    add(Compound.cast(cut_extrude5_cut.Shape()).solids(), mode=Mode.REPLACE)

    # Fillet8
    fillet8_edges = [part_1.edges().sort_by_distance(p)[0] for p in [
        (-30.223844214, -9.803963631, -27.619326858),
        (-52.329130199, -9.803963631, -13.066098263),
        (-30.223844214, -9.803963631, 1.487130332),
        (-33.705417369, -9.803963631, 13.793142212),
        (-34.097751043, -9.803963631, 4.923018739),
        (-56.875514756, -9.803963631, -10.072942065),
        (-89.222466664, -9.803963631, 11.222986239),
        (-60.614189207, -9.803963631, 14.983341803),
        (-89.222466664, -9.803963631, -37.355182765),
        (-56.875514756, -9.803963631, -16.05925446),
        (-34.097751043, -9.803963631, -31.055215265),
        (-33.705417369, -9.803963631, -39.925338738),
        (-60.614189207, -9.803963631, -41.115538328),
        (-94.723844214, -9.803963631, 8.858558904),
        (-61.421899314, -9.803963631, -13.066098263),
        (-94.723844214, -9.803963631, -34.99075543),
    ]]
    fillet(fillet8_edges, radius=FILLET8_R)

    # Sketch7 → Cut-Extrude6 (cut, through all)
    with SkipClean():  # the faces are left unmerged after this step: merging them gives an invalid solid
        with BuildSketch(Plane(origin=(0, -7.303963631, 0), x_dir=(1, 0, 0), z_dir=(0, 1, 0))):
            Polygon((-19.835127767, 69.740620805), (-19.835127767, 43.816242833), (-19.835127767, -17.684046307), (-19.835127767, -26.647477061), (6.358945615, -26.647477061), (6.358945615, 69.740620805), align=None)
        extrude(amount=-CUT_EXTRUDE6_DEPTH, mode=Mode.SUBTRACT)

    # Fillet9
    fillet9_edges = [part_1.edges().sort_by_distance(p)[0] for p in [
        (-19.835127767, -9.803963815, -43.816242833),
        (-19.835127767, -9.803963816, 17.684046307),
    ]]
    fillet(fillet9_edges, radius=FILLET9_R)

    # Sketch8 → Cut-Extrude7 (cut)
    with SkipClean():  # the faces are left unmerged after this step: merging them gives an invalid solid
        with BuildSketch(Plane(origin=(0, -7.303963631, 0), x_dir=(1, 0, 0), z_dir=(0, 1, 0))):
            with Locations((-98.614189207, 13.066098263)):
                Rectangle(SKETCH8_W, SKETCH8_H)
        extrude(amount=-CUT_EXTRUDE7_DEPTH, mode=Mode.SUBTRACT)

    # Fillet10: read off the stored shape, not the designer's step
    # Fillet10 outline → Fillet10 (cut)
    with SkipClean():  # the faces are left unmerged after this step: merging them gives an invalid solid
        with BuildSketch(Plane(origin=(0, 0, 0), x_dir=(1, 0, 0), z_dir=(0, 1, 0)).offset(FILLET10_START)):
            with BuildLine():
                ThreePointArc((-104.614189207, -14.933901737), (-103.149723113, -11.398367831), (-99.614189207, -9.933901737))
                Line((-99.614189207, -9.933901737), (-104.614189207, -9.933901737))
                Line((-104.614189207, -9.933901737), (-104.614189207, -14.933901737))
            make_face()
            with BuildLine():
                Line((-104.614189207, 36.066098263), (-99.614189207, 36.066098263))
                ThreePointArc((-99.614189207, 36.066098263), (-103.149723113, 37.530564357), (-104.614189207, 41.066098263))
                Line((-104.614189207, 41.066098263), (-104.614189207, 36.066098263))
            make_face()
        extrude(amount=FILLET10_DEPTH, mode=Mode.SUBTRACT)

    # Fillet10 2 outline → Fillet10 2 (add)
    with SkipClean():  # the faces are left unmerged after this step: merging them gives an invalid solid
        with BuildSketch(Plane(origin=(0, 0, 0), x_dir=(1, 0, 0), z_dir=(0, 1, 0)).offset(FILLET10_START_2)):
            with BuildLine():
                Line((-92.614189207, -9.933901737), (-92.614189207, -4.961208042))
                ThreePointArc((-92.614189207, -4.961208042), (-94.088248192, -8.479076735), (-97.614114644, -9.933901737))
                Line((-97.614114644, -9.933901737), (-92.614189207, -9.933901737))
            make_face()
            with BuildLine():
                ThreePointArc((-97.614114644, 36.066098263), (-94.088248192, 34.61127326), (-92.614189207, 31.093404568))
                Line((-92.614189207, 31.093404568), (-92.614189207, 36.066098263))
                Line((-92.614189207, 36.066098263), (-97.614114644, 36.066098263))
            make_face()
        extrude(amount=FILLET10_2_DEPTH)

    # Fillet12
    fillet12_edges = [part_1.edges().sort_by_distance(p)[0] for p in [
        (-92.614189207, -9.803963815, 4.961208043),
        (-92.614189207, -9.803963815, -31.093404569),
    ]]
    fillet(fillet12_edges, radius=FILLET12_R)


solid = part_1.part
